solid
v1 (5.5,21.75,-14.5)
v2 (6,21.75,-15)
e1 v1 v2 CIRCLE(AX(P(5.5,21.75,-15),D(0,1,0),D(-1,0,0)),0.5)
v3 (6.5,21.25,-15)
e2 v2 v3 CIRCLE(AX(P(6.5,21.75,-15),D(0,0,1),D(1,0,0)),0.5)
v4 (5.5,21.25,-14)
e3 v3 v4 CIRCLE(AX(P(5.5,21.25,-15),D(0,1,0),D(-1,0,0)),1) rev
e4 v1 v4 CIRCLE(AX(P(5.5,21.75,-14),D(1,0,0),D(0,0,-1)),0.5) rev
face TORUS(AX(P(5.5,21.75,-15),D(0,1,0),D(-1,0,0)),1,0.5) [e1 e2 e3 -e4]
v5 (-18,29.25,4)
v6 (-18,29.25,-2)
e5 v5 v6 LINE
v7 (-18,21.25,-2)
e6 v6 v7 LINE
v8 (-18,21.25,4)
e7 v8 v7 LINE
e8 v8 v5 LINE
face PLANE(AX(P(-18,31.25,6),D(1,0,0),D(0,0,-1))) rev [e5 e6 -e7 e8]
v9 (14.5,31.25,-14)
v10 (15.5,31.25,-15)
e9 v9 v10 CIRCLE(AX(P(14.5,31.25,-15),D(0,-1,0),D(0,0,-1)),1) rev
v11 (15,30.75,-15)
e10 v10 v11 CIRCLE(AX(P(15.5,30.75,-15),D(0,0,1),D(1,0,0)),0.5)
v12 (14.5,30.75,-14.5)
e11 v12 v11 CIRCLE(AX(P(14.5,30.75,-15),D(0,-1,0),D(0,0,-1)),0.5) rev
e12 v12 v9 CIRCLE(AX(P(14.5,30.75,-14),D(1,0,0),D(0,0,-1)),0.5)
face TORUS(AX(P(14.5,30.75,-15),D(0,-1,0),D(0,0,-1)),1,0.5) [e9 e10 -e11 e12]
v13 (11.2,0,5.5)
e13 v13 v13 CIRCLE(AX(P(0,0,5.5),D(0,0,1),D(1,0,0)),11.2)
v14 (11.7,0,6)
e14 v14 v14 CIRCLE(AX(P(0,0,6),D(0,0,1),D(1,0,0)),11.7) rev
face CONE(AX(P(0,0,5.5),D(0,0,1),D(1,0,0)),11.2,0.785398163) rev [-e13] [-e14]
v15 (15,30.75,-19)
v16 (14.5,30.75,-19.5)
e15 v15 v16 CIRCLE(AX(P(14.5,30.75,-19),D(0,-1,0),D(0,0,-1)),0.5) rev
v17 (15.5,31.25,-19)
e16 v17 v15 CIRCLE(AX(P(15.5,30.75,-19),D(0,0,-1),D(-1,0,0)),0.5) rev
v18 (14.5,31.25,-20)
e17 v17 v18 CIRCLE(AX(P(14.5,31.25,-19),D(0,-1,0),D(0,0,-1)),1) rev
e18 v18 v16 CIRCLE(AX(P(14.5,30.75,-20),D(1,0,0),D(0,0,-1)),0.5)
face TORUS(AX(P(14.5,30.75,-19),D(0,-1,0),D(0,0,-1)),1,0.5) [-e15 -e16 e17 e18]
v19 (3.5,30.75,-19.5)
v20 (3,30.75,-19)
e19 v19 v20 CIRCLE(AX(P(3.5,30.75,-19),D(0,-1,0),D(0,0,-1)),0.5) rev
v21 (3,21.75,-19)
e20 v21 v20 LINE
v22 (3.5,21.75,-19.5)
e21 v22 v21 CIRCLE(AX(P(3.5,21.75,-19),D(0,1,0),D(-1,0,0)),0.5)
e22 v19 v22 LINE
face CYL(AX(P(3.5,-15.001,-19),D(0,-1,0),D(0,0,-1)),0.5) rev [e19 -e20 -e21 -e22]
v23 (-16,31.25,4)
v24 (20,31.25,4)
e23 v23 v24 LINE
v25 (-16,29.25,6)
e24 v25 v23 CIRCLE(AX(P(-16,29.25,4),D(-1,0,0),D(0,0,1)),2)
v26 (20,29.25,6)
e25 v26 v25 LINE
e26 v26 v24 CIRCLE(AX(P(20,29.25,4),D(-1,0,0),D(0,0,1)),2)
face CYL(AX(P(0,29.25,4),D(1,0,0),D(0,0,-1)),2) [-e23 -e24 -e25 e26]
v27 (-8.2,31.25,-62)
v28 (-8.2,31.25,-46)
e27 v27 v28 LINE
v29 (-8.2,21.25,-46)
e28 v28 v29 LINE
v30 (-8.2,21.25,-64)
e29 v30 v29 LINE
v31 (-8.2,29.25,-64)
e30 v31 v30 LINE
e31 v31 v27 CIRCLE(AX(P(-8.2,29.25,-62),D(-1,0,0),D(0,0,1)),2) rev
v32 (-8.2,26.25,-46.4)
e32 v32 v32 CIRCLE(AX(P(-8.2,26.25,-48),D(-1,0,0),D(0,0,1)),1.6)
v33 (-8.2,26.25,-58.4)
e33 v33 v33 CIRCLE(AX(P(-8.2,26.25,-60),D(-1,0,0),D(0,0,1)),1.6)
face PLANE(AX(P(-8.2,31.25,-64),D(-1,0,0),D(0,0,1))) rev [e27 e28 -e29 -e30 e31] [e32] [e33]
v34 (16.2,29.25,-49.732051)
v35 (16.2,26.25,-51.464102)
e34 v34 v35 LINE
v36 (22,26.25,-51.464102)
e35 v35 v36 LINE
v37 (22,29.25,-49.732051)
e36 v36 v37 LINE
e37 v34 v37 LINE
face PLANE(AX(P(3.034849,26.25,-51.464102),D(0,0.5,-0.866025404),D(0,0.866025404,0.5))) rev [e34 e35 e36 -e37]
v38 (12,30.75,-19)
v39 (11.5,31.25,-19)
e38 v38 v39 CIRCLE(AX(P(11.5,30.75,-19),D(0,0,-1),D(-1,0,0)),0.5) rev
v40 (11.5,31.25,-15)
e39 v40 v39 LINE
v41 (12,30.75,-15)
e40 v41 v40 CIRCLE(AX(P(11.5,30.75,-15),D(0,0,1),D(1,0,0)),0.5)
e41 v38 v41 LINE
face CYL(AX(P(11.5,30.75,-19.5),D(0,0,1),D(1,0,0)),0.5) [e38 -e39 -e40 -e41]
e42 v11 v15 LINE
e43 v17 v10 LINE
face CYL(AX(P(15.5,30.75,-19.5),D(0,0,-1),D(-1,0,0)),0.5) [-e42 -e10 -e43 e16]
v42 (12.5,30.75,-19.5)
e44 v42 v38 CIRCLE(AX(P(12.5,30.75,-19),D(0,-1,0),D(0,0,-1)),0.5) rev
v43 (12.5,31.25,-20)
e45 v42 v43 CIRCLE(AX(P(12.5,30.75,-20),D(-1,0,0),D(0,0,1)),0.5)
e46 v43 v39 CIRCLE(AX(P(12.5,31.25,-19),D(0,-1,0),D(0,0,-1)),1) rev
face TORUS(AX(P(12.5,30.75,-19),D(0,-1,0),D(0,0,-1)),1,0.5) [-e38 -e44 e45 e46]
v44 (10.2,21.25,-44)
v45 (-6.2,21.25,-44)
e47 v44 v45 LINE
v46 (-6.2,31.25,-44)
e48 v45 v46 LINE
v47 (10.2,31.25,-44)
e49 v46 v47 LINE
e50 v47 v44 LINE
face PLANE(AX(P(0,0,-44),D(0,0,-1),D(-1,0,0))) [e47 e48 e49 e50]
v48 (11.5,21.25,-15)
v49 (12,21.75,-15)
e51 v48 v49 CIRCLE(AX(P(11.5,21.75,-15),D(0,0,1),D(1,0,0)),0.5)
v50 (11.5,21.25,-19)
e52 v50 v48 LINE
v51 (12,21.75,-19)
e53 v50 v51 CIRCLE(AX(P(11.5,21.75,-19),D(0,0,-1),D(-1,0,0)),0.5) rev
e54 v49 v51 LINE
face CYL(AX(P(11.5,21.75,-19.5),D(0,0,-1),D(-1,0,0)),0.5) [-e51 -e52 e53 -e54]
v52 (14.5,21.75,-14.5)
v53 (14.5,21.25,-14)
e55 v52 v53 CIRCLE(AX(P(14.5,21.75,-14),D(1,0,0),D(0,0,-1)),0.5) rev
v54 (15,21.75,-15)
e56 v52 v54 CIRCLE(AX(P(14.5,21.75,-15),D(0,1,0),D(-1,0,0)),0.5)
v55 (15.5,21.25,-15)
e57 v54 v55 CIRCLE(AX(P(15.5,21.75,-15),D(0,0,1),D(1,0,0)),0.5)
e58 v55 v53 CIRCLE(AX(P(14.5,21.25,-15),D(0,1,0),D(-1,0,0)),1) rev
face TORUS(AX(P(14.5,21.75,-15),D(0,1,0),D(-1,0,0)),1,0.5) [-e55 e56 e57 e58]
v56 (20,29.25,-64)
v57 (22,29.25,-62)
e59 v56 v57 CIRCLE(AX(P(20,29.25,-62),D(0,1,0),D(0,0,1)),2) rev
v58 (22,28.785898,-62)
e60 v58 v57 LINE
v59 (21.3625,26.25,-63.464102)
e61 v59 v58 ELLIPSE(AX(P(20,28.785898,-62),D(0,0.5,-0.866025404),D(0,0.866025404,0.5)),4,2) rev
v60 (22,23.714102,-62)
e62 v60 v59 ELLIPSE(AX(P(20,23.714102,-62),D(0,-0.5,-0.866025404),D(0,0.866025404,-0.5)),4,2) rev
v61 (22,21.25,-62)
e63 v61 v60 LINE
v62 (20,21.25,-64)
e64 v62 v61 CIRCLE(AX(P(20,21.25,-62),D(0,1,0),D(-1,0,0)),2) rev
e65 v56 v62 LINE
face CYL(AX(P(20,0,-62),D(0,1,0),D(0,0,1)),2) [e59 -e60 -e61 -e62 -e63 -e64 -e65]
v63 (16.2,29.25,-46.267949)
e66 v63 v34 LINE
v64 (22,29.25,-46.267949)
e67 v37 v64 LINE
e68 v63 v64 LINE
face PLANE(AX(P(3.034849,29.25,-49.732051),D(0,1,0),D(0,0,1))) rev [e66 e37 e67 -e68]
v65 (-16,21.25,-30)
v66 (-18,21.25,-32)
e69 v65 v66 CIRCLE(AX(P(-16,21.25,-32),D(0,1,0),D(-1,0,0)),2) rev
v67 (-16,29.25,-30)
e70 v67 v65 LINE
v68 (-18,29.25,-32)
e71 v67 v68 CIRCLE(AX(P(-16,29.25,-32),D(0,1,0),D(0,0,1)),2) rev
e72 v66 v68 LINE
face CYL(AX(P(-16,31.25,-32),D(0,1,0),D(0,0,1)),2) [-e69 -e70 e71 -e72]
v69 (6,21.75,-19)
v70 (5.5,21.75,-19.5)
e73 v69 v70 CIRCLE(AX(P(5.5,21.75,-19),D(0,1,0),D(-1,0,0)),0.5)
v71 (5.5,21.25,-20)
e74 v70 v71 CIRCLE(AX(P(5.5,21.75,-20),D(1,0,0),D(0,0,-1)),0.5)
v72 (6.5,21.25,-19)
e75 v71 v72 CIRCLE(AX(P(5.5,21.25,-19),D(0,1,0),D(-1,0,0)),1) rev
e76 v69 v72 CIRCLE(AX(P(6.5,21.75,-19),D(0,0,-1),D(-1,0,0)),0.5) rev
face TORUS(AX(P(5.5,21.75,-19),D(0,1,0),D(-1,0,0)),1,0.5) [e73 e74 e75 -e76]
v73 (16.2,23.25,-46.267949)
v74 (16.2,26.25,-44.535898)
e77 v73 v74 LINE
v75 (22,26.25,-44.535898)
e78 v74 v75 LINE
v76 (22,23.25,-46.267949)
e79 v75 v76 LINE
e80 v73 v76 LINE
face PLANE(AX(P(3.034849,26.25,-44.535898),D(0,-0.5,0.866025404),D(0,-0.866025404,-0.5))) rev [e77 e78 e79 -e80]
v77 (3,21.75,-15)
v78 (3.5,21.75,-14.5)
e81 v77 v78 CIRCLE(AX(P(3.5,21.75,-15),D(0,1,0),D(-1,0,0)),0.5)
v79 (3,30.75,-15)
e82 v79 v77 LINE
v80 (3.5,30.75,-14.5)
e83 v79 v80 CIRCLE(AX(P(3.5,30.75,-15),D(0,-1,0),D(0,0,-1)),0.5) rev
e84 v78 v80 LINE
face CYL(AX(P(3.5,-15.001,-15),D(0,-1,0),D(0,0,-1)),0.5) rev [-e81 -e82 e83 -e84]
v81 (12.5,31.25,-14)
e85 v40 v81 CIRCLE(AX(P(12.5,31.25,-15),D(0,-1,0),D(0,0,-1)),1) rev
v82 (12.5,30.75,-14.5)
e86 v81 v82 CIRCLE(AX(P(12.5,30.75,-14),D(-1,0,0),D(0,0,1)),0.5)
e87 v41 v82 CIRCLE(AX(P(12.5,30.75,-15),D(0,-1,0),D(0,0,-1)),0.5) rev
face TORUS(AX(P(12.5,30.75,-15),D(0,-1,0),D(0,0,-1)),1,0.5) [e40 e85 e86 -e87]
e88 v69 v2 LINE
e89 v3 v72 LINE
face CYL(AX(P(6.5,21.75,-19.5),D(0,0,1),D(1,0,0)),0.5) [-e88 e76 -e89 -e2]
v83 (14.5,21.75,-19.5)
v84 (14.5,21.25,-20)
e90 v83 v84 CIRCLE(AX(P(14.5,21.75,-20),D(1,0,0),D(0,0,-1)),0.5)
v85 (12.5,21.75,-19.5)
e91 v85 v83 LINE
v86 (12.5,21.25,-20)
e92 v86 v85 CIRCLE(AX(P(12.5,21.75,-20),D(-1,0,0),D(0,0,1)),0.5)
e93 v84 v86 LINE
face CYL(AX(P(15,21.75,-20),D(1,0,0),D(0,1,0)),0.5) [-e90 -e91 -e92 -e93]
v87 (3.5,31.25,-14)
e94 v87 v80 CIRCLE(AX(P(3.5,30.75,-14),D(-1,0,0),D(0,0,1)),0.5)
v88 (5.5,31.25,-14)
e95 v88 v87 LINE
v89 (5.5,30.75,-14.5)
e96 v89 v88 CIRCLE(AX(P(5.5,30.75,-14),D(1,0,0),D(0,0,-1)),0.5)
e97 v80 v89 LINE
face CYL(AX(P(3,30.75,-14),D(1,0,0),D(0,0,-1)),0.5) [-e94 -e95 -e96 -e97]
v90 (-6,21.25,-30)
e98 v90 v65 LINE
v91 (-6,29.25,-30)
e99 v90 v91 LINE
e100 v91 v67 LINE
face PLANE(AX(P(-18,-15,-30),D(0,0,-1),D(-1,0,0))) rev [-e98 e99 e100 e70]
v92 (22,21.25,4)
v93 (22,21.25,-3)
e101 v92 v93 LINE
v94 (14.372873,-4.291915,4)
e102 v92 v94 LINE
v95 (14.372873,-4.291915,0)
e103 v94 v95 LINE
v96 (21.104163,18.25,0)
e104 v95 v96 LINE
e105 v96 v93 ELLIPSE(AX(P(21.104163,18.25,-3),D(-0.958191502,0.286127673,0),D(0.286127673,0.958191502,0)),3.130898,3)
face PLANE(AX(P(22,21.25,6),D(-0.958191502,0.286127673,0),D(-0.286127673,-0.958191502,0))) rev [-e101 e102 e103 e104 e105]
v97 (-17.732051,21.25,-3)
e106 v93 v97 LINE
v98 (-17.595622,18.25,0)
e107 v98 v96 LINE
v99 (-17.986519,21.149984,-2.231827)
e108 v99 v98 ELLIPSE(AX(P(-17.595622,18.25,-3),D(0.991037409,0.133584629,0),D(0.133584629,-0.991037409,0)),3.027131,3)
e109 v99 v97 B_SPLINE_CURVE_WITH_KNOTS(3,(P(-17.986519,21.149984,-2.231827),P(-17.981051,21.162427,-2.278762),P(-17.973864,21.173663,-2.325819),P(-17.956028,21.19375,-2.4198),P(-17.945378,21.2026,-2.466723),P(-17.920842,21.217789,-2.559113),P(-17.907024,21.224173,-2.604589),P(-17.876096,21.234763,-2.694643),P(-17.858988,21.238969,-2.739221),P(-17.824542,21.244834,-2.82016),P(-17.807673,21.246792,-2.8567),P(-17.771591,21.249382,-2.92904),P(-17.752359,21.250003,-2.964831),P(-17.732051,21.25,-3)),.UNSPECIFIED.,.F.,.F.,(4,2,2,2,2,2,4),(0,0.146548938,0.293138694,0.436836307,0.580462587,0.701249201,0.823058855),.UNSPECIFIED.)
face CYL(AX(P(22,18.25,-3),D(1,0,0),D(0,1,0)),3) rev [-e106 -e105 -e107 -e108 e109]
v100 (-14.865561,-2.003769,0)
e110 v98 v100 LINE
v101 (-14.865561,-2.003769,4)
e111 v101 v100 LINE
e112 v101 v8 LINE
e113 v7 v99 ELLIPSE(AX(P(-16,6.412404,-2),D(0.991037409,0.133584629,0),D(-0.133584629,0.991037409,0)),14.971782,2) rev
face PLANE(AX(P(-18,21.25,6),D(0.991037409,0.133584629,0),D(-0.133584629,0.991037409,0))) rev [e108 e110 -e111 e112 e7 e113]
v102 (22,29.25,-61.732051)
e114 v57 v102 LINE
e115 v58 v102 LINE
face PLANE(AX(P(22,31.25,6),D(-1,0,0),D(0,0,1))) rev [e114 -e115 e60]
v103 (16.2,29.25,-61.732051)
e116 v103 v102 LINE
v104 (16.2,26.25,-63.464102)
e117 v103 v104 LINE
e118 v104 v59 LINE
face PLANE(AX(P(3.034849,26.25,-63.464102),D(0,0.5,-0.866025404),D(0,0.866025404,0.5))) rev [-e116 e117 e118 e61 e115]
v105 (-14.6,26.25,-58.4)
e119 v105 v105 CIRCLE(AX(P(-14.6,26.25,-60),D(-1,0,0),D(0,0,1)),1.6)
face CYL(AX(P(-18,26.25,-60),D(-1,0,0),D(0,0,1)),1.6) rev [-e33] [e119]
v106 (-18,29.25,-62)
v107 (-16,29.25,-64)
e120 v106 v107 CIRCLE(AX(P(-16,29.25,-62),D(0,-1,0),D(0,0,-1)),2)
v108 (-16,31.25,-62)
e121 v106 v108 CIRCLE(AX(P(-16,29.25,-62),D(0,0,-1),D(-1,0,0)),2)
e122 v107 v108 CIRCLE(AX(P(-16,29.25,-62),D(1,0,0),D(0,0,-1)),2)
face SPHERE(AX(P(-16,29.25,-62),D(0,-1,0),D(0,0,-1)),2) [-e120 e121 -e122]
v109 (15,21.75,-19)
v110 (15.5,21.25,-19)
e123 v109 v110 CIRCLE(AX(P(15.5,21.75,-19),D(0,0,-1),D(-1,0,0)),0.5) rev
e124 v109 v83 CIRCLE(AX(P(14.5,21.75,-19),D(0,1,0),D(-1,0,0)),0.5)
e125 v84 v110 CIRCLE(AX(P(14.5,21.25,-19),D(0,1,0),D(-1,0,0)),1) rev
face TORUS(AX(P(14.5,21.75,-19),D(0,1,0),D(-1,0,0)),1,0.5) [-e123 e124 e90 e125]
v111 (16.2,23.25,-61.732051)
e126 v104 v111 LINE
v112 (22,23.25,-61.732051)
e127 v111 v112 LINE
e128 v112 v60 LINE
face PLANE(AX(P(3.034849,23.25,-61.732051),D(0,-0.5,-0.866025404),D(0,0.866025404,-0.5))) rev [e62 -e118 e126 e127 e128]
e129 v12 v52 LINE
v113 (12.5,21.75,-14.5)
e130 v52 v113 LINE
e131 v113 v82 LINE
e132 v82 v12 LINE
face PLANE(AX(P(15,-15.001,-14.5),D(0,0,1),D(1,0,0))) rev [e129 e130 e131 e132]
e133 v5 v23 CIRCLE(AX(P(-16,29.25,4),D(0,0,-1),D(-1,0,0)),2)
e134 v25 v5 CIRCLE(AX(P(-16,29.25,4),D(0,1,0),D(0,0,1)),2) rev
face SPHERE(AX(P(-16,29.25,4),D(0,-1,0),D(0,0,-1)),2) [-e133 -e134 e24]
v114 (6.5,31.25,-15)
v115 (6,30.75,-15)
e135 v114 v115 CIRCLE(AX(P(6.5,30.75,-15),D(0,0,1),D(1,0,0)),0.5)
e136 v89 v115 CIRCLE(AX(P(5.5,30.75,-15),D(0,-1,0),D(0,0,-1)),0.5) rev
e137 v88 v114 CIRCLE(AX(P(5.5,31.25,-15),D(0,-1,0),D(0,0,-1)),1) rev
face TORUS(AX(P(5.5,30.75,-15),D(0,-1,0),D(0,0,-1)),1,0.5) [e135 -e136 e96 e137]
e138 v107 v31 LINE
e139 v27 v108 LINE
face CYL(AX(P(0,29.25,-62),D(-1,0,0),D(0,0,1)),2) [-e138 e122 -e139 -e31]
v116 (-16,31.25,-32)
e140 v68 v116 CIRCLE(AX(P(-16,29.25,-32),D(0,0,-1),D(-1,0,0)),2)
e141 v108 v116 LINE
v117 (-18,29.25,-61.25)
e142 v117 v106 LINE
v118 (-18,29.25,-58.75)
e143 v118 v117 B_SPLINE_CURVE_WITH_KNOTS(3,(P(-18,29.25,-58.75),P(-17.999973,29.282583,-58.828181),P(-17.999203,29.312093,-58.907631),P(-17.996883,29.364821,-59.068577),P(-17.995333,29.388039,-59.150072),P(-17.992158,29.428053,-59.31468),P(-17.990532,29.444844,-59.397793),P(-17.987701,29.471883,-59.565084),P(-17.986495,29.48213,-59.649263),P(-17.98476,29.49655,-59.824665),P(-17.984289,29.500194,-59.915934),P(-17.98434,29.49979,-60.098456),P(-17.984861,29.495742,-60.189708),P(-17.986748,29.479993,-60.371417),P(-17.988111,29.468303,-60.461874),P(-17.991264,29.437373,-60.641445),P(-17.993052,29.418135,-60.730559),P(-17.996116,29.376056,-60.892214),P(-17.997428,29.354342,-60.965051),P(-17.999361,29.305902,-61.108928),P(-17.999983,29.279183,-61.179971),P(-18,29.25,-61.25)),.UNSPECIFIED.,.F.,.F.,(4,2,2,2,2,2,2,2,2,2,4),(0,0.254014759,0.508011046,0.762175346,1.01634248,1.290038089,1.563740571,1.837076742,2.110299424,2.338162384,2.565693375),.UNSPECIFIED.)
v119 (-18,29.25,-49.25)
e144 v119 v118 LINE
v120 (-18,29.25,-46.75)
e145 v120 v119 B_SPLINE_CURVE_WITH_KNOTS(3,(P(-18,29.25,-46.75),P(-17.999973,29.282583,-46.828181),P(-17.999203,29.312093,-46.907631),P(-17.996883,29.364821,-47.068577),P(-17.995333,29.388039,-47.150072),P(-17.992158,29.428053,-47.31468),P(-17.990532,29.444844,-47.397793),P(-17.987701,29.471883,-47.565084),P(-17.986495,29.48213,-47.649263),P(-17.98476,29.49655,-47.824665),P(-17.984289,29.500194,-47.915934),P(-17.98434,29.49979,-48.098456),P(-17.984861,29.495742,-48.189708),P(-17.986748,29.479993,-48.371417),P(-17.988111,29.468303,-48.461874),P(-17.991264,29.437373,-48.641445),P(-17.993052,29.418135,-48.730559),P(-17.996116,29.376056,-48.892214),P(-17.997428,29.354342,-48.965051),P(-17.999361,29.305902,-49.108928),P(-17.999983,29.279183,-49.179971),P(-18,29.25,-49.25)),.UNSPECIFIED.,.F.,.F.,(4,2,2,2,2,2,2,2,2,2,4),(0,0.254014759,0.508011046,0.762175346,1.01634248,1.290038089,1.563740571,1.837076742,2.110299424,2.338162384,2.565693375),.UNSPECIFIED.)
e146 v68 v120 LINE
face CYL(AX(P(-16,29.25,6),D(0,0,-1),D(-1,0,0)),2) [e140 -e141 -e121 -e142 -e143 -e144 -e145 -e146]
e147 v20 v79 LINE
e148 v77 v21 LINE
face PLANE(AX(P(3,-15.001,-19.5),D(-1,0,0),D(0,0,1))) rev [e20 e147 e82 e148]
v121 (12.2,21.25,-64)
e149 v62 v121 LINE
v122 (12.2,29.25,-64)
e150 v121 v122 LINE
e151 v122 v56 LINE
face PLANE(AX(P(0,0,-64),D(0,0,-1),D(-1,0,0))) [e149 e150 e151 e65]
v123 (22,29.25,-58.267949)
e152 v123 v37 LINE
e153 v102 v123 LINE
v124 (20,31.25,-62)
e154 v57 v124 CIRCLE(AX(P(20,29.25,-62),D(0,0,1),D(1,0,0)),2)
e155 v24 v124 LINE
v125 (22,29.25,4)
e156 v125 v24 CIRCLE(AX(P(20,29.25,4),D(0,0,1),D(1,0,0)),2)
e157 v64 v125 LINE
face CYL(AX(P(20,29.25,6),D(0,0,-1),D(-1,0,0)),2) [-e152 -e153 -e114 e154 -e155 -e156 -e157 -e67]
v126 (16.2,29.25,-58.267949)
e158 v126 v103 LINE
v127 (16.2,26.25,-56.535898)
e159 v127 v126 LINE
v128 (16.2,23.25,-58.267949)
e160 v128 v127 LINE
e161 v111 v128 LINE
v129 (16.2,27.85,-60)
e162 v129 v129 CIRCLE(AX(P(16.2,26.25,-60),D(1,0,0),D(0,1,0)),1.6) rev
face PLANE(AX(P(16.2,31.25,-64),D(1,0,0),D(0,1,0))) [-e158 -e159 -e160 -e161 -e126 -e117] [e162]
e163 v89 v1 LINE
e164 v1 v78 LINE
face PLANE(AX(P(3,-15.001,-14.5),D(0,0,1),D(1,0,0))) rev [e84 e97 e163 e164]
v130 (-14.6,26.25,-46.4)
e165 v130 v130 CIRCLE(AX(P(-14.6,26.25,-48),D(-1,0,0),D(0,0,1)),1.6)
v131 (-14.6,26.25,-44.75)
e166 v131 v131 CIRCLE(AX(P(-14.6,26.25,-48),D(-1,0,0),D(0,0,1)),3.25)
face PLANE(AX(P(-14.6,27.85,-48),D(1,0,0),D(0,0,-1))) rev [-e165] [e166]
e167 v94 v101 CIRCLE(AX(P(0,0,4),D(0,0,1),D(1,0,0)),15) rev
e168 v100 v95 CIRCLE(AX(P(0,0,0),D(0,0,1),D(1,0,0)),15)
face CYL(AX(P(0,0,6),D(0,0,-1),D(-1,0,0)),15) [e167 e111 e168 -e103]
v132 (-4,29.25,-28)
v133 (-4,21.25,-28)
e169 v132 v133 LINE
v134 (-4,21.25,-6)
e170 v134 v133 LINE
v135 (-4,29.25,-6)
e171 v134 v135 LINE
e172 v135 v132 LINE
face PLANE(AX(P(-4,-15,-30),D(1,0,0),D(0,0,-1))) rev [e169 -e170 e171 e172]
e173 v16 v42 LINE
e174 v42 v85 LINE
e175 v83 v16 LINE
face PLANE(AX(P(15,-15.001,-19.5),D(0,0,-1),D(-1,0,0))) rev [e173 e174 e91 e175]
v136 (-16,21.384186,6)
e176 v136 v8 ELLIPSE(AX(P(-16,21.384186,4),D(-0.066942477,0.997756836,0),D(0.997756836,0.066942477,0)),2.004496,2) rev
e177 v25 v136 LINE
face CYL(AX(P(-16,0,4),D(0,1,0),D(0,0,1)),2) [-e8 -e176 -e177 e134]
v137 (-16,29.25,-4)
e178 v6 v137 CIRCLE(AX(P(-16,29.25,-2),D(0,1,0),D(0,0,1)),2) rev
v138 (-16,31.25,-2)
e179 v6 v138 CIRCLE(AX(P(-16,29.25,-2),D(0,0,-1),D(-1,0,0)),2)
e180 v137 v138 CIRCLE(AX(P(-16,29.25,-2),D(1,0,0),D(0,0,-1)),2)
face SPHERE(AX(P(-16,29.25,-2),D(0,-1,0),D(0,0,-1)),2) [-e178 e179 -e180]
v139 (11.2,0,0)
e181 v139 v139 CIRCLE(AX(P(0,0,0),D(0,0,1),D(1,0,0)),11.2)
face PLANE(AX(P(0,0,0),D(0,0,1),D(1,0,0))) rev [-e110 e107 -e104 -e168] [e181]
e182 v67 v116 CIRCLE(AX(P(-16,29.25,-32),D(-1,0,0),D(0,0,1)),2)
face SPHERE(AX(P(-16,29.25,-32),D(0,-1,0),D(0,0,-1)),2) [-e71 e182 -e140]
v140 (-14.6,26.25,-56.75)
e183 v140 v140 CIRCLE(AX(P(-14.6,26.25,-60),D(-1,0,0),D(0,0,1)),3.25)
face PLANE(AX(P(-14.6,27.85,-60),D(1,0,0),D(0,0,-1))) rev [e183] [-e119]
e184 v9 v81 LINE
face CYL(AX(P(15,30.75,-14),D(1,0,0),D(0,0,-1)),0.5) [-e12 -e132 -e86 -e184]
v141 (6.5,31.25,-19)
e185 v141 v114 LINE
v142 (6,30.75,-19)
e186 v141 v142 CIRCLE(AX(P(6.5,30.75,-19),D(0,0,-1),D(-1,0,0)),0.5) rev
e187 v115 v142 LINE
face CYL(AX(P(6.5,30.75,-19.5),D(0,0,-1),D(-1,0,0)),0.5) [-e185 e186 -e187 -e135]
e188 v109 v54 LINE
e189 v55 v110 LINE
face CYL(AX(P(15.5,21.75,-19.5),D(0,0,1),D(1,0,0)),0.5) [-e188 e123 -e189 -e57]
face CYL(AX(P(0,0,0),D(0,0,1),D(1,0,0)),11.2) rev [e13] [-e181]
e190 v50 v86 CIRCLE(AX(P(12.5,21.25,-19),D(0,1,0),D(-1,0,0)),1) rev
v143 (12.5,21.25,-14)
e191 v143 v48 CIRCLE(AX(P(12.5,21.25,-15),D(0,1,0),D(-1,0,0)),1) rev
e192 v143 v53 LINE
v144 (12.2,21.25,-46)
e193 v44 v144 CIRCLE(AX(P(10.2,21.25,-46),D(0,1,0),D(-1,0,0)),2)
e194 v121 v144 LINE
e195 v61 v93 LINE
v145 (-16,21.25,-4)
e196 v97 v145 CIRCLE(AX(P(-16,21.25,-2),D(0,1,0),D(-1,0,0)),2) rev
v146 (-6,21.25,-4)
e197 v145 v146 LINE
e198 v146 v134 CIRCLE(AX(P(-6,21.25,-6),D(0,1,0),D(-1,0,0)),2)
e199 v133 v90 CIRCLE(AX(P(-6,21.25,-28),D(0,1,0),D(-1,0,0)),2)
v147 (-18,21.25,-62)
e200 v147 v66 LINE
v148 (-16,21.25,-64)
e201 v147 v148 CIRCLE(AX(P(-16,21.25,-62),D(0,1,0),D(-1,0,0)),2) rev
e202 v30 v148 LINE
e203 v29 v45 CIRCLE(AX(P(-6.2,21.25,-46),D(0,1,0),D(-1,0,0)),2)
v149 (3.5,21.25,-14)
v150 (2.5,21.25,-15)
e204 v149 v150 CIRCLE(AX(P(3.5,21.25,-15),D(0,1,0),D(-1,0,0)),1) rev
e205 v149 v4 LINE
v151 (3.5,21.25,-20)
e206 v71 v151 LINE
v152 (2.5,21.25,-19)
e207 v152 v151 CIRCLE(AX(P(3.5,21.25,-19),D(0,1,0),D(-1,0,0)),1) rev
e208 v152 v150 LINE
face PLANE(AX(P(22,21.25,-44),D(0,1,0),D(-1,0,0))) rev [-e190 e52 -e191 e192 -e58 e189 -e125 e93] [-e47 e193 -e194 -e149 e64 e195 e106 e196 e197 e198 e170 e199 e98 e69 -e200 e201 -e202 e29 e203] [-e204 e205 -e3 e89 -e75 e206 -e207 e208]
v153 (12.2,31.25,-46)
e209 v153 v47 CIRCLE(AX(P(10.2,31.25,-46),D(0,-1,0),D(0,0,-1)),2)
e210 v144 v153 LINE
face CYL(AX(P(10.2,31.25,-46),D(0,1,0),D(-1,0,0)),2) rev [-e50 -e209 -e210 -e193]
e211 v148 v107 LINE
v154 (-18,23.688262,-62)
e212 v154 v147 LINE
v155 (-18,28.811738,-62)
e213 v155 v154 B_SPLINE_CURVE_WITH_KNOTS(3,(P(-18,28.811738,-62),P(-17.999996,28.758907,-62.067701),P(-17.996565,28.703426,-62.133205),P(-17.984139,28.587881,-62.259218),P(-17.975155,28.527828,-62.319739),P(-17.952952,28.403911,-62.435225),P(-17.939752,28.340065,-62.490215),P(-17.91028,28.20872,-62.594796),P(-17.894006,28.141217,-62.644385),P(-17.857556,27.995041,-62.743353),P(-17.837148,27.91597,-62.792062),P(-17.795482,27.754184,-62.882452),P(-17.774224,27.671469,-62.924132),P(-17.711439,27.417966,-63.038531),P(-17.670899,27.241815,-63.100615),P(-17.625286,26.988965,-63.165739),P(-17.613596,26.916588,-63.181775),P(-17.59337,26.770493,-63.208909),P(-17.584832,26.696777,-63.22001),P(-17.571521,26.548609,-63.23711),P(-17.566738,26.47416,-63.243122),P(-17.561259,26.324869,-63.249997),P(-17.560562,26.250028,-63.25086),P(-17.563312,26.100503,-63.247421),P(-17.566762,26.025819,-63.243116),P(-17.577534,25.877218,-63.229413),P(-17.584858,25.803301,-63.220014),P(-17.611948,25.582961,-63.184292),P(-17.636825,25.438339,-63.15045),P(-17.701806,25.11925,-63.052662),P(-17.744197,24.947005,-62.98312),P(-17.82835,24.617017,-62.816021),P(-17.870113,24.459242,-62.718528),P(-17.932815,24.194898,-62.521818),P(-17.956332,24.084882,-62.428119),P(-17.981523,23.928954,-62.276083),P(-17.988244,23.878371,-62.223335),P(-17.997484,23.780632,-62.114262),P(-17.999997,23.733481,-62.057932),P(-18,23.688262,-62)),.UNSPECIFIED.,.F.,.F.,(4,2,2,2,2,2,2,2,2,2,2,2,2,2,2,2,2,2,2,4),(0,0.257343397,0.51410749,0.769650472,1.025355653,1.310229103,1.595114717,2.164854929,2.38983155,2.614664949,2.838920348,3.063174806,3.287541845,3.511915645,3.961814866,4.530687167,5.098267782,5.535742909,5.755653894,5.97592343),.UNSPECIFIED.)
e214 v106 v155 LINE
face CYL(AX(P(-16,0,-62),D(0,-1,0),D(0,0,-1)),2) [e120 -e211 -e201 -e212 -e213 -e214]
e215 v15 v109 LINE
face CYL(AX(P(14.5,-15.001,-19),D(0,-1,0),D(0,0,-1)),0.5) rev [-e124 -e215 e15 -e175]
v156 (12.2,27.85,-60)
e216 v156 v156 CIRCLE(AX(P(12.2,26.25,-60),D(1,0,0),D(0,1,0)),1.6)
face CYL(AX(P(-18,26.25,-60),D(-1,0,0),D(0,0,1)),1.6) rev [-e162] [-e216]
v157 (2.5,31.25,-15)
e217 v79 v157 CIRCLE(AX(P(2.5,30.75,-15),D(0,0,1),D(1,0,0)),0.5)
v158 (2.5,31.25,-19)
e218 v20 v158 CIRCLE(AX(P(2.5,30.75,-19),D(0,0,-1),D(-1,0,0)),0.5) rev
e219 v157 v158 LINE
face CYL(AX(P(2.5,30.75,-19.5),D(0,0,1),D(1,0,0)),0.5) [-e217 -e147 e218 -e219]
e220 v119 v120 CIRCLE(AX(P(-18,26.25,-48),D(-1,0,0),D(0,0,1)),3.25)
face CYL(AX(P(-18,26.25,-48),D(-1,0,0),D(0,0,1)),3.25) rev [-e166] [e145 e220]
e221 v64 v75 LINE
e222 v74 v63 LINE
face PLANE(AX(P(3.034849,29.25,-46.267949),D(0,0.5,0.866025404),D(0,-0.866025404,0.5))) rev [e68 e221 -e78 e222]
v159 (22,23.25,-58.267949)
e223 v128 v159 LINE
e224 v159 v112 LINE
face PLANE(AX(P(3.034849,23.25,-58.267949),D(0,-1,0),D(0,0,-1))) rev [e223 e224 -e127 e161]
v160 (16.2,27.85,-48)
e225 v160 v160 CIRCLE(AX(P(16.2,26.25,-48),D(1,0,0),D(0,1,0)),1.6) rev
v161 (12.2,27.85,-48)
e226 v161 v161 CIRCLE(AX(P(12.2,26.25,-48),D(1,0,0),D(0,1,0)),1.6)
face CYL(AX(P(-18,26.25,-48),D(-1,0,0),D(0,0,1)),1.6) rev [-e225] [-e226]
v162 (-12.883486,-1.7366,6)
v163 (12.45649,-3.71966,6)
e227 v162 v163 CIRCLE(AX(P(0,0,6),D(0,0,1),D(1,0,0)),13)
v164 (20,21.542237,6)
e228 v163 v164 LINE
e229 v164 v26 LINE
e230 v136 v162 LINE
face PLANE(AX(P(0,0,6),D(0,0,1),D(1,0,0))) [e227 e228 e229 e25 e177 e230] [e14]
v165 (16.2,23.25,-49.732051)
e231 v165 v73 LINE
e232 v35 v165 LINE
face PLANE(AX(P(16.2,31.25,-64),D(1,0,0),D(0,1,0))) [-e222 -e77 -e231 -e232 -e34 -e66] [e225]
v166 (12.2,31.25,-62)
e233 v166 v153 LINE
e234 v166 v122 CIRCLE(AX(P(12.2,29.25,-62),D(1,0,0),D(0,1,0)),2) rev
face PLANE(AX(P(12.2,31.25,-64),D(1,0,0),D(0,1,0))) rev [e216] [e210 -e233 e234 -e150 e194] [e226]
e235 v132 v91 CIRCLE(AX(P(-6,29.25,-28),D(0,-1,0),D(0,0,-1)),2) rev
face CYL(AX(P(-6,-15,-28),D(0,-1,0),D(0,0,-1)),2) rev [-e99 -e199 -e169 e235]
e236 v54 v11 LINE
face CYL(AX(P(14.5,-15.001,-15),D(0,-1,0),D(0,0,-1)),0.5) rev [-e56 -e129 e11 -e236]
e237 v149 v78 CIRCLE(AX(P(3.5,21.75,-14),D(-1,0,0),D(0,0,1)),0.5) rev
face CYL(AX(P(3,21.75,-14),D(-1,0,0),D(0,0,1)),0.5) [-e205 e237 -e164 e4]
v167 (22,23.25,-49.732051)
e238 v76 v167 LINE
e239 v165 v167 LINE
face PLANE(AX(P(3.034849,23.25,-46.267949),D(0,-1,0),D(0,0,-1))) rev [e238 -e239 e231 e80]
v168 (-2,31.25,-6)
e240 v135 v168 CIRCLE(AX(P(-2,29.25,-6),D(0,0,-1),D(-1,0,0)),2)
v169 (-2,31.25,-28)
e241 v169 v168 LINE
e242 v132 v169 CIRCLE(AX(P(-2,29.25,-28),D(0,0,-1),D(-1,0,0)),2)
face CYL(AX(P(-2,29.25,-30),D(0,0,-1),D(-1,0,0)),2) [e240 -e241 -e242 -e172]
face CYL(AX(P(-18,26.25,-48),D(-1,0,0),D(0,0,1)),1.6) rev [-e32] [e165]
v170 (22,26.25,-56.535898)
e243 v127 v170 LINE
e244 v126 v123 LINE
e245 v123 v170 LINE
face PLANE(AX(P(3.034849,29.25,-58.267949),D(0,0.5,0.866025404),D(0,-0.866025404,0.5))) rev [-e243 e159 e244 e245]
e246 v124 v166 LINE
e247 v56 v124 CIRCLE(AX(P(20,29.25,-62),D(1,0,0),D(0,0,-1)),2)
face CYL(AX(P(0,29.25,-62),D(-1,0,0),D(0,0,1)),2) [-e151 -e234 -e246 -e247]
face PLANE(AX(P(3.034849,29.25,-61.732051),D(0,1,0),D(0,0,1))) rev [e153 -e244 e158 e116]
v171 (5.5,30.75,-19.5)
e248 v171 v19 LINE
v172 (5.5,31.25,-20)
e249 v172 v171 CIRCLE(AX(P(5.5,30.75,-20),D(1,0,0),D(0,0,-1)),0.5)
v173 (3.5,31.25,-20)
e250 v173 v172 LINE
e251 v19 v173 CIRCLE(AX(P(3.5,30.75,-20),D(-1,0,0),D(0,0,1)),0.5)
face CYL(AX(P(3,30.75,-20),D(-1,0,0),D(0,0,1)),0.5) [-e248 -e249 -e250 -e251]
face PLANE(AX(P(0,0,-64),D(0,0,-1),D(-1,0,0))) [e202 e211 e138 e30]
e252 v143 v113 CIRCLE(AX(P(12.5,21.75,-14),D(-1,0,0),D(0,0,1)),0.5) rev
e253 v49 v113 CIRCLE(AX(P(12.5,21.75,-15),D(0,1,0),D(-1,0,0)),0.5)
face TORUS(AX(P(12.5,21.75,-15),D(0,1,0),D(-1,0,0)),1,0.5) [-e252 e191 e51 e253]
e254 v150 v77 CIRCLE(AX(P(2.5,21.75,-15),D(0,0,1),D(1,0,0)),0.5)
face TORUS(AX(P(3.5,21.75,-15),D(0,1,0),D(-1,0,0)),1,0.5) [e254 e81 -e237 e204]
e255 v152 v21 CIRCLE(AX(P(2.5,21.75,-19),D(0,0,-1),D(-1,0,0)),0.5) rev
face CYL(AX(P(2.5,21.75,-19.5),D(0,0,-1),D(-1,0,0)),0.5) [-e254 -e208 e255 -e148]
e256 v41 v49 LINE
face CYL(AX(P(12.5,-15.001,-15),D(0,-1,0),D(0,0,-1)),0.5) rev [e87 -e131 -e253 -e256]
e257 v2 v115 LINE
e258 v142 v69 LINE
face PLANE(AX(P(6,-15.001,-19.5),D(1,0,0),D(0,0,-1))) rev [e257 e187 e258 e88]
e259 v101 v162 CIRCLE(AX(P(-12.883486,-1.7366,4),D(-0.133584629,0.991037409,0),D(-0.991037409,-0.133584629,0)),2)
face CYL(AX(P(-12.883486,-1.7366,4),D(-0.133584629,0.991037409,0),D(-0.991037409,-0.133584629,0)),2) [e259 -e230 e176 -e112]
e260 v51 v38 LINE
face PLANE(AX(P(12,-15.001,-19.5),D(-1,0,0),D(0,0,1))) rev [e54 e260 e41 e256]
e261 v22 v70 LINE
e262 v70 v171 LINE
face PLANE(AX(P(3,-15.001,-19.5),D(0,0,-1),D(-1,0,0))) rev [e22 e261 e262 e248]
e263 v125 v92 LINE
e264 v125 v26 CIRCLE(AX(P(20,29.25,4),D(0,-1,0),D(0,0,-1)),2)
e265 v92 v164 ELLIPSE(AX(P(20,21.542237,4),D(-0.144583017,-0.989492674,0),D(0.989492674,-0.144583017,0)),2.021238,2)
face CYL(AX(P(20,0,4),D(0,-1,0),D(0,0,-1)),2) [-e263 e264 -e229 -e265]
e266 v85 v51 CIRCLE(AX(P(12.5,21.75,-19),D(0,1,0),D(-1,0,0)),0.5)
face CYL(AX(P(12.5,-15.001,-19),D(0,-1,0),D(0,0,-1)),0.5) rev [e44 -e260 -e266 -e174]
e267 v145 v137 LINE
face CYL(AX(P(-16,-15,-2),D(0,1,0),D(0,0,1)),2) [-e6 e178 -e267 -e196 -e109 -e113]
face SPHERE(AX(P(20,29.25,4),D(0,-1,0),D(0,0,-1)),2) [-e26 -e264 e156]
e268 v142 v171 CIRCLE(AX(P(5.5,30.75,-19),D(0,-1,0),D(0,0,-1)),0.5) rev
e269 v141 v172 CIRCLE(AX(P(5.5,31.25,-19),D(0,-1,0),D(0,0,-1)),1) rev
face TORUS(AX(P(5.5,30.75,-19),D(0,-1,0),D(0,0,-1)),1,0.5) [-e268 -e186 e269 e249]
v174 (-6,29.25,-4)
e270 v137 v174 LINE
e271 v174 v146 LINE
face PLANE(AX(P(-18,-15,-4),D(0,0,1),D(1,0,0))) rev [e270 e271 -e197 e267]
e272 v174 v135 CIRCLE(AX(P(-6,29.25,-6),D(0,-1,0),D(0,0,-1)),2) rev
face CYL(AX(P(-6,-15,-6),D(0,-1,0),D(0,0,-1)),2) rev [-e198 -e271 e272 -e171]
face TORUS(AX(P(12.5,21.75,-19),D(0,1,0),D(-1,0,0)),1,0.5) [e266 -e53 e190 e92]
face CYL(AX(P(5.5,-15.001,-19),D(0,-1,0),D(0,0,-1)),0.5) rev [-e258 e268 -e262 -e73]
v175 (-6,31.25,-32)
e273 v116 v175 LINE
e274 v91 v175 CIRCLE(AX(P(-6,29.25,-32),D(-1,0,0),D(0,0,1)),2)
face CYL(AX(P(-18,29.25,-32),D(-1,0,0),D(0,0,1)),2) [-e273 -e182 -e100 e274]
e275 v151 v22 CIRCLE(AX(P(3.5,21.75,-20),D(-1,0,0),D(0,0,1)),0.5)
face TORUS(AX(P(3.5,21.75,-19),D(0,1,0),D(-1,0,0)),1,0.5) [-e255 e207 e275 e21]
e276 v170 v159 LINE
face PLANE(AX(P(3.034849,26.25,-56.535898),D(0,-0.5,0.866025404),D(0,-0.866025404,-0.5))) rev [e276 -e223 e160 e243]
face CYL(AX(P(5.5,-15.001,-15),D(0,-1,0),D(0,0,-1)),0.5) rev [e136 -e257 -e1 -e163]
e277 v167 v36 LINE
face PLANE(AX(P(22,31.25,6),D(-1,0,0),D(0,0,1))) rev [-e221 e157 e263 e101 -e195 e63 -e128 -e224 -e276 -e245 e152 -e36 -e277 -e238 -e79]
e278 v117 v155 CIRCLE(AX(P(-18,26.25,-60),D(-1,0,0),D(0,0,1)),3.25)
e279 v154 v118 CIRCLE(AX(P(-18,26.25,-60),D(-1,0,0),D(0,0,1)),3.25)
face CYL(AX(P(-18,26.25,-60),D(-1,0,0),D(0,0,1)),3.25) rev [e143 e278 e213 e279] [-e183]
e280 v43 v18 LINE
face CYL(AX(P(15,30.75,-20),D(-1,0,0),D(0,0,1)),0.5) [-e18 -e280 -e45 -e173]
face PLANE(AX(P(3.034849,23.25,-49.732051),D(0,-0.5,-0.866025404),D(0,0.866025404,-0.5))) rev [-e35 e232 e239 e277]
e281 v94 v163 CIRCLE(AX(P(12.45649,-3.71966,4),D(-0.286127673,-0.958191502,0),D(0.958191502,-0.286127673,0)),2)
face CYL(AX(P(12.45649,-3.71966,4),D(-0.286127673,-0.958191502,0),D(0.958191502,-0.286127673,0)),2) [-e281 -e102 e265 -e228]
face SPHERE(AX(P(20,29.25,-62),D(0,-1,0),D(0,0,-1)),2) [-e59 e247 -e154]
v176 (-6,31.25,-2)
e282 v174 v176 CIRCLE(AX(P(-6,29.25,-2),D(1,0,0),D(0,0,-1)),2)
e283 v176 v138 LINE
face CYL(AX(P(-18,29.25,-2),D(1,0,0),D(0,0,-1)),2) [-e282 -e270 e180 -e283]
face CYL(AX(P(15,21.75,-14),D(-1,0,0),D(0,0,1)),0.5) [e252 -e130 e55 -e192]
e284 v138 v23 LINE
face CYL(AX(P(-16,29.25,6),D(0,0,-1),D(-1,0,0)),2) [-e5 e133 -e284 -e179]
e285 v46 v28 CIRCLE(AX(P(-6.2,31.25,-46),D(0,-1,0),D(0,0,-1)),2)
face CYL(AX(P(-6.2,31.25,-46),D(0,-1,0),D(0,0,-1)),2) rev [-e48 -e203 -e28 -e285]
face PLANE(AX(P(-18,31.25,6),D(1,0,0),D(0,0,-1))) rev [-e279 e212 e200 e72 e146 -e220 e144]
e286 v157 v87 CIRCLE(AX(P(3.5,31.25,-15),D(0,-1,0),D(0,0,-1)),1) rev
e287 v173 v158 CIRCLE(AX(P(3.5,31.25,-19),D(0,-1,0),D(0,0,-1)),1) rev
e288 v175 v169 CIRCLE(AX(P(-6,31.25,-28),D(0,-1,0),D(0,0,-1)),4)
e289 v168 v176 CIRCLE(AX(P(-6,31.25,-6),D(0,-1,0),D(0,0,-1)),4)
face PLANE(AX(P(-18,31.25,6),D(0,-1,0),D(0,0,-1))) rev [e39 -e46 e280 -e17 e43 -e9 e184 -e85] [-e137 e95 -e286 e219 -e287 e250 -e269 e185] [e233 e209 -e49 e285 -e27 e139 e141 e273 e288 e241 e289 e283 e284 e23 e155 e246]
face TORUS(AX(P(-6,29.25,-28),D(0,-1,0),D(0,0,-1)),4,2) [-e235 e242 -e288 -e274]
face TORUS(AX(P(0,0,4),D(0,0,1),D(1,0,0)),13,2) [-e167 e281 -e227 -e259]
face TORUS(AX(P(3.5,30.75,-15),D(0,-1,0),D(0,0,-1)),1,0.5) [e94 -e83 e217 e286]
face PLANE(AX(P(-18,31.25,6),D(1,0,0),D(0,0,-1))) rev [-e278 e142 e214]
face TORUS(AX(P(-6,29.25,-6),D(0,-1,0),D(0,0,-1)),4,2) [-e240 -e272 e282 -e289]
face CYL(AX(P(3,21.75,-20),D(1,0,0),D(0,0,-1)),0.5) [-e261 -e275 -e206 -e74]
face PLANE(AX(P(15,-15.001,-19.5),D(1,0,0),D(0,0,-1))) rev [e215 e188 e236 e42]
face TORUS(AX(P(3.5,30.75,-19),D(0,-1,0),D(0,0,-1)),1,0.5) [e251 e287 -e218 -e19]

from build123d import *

# Parameters (mm, degrees)
BOSS_EXTRUDE1_DEPTH                                 = 6
SKETCH2_R                                           = 11.2
CUT_EXTRUDE1_DEPTH                                  = 39.685430074
SKETCH3_W                                           = 40
SKETCH3_H                                           = 10
BOSS_EXTRUDE2_DEPTH                                 = 44
SKETCH4_W                                           = 9.8
SKETCH4_H                                           = 10
BOSS_EXTRUDE3_DEPTH                                 = 20
FILLET1_R                                           = 3
CBORE_FOR_M3_HEX_SOCKET_HEAD_CAP_SCREW1_D           = 3.2
CBORE_FOR_M3_HEX_SOCKET_HEAD_CAP_SCREW1_CBORE_D     = 6.5
CBORE_FOR_M3_HEX_SOCKET_HEAD_CAP_SCREW1_CBORE_DEPTH = 3.4
CUT_EXTRUDE3_DEPTH                                  = 5.8
SKETCH9_W                                           = 14
SKETCH9_H                                           = 26
CUT_EXTRUDE4_DEPTH                                  = 82.969887764
FILLET2_R                                           = 2
FILLET3_R                                           = 2
FILLET4_R                                           = 2
FILLET5_R                                           = 2
CHAMFER1_SIZE                                       = 0.5
CUT_EXTRUDE5_REACH                                  = 83.97
SKETCH10_W                                          = 3
SKETCH10_H                                          = 5
FILLET6_R                                           = 0.5


with BuildPart() as part:
    # Sketch1 → Boss-Extrude1 (new body)
    with BuildSketch(Plane.XY):
        with BuildLine():
            Line((22, 31.25), (22, 21.25))
            Line((22, 21.25), (14.372872533, -4.291915093))
            ThreePointArc((14.372872533, -4.291915093), (-1.170294045, -14.954277376), (-14.865561141, -2.003769437))
            Line((-14.865561141, -2.003769437), (-18, 21.25))
            Line((-18, 21.25), (-18, 31.25))
            Line((-18, 31.25), (22, 31.25))
        make_face()
    extrude(amount=BOSS_EXTRUDE1_DEPTH)

    # Sketch2 → Cut-Extrude1 (cut, through all)
    with BuildSketch(Plane.XY.offset(6)):
        Circle(SKETCH2_R)
    extrude(amount=-CUT_EXTRUDE1_DEPTH, mode=Mode.SUBTRACT)

    # Sketch3 → Boss-Extrude2 (add)
    with BuildSketch(Plane(origin=(0, 0, 0), x_dir=(-1, 0, 0), z_dir=(0, 0, -1))):
        with Locations((-2, 26.25)):
            Rectangle(SKETCH3_W, SKETCH3_H)
    extrude(amount=BOSS_EXTRUDE2_DEPTH)

    # Sketch4 → Boss-Extrude3 (add)
    with BuildSketch(Plane(origin=(0, 0, -44), x_dir=(-1, 0, 0), z_dir=(0, 0, -1))):
        with Locations((-17.1, 26.25)):
            Rectangle(SKETCH4_W, SKETCH4_H)
        with Locations((13.1, 26.25)):
            Rectangle(SKETCH4_W, SKETCH4_H)
    extrude(amount=BOSS_EXTRUDE3_DEPTH)

    # Fillet1
    fillet1_edges = [part.edges().sort_by_distance(p)[0] for p in [
        (2, 21.25, 0),
    ]]
    fillet(fillet1_edges, radius=FILLET1_R)

    # CBORE for M3 Hex Socket Head Cap Screw1 (through all)
    with Locations(Plane.ZY.offset(18)):
        with Locations((-60, 26.25), (-48, 26.25)):
            CounterBoreHole(CBORE_FOR_M3_HEX_SOCKET_HEAD_CAP_SCREW1_D / 2, CBORE_FOR_M3_HEX_SOCKET_HEAD_CAP_SCREW1_CBORE_D / 2, CBORE_FOR_M3_HEX_SOCKET_HEAD_CAP_SCREW1_CBORE_DEPTH)

    # Sketch8 → Cut-Extrude3 (cut)
    with BuildSketch(Plane(origin=(22, 0, 0), x_dir=(0, 0, -1), z_dir=(1, 0, 0))):
        Polygon((49.732050808, 29.25), (46.267949192, 29.25), (44.535898385, 26.25), (46.267949192, 23.25), (49.732050808, 23.25), (51.464101615, 26.25), align=None)
        Polygon((58.267949192, 29.25), (56.535898385, 26.25), (58.267949192, 23.25), (61.732050808, 23.25), (63.464101615, 26.25), (61.732050808, 29.25), align=None)
    extrude(amount=-CUT_EXTRUDE3_DEPTH, mode=Mode.SUBTRACT)

    # Sketch9 → Cut-Extrude4 (cut, through all)
    with BuildSketch(Plane(origin=(0, 31.25, 0), x_dir=(1, 0, 0), z_dir=(0, 1, 0))):
        with Locations((-11, 17)):
            Rectangle(SKETCH9_W, SKETCH9_H)
    extrude(amount=-CUT_EXTRUDE4_DEPTH, mode=Mode.SUBTRACT)

    # Fillet2
    fillet2_edges = [part.edges().sort_by_distance(p)[0] for p in [
        (-4, 26.25, -30),
        (-4, 26.25, -4),
    ]]
    fillet(fillet2_edges, radius=FILLET2_R)

    # Fillet3
    fillet3_edges = [part.edges().sort_by_distance(p)[0] for p in [
        (12.2, 26.25, -44),
        (-8.2, 26.25, -44),
    ]]
    fillet(fillet3_edges, radius=FILLET3_R)

    # Fillet4
    # the kernel refuses this fillet: 2 mm, written as the material it takes off along each edge
    with BuildSketch(Plane(origin=(-14.865561141, -2.003769437, 6), x_dir=(0.9910374094124887, 0.13358462914940175, 0), z_dir=(-0.13358462914940175, 0.9910374094124889, 0))) as fillet4_piece_1:
        with BuildLine():
            CenterArc((FILLET4_R, FILLET4_R), FILLET4_R, 180, 90)
            Line((0, FILLET4_R), (0, 0))
            Line((0, 0), (FILLET4_R, 0))
        make_face()
    extrude(amount=28.464068275, mode=Mode.SUBTRACT)
    with BuildSketch(Plane(origin=(0, 0, 6), x_dir=(0.9581915021729206, -0.2861276728378469, 0), z_dir=(0.2861276728378469, 0.9581915021729206, 0))) as fillet4_piece_2:
        with BuildLine():
            CenterArc((15 - FILLET4_R, FILLET4_R), FILLET4_R, 270, 90)
            Line((15, FILLET4_R), (15, 0))
            Line((15, 0), (15 - FILLET4_R, 0))
        make_face()
    revolve(axis=Axis((0, 0, 6), (0, 0, -1)), revolution_arc=155.696949385, mode=Mode.SUBTRACT)
    with BuildSketch(Plane(origin=(23.430638364, 26.040957511, 6), x_dir=(0, 0, -1), z_dir=(-0.2861276728378473, -0.9581915021729205, 0))) as fillet4_piece_3:
        with BuildLine():
            CenterArc((FILLET4_R, -FILLET4_R), FILLET4_R, 90, 90)
            Line((0, -FILLET4_R), (0, 0))
            Line((0, 0), (FILLET4_R, 0))
        make_face()
    extrude(amount=31.656378224, mode=Mode.SUBTRACT)
    with BuildSketch(Plane(origin=(-18, 16.25, 6), x_dir=(0, 0, -1), z_dir=(0, 1, 0)), Plane(origin=(22, 36.25, 6), x_dir=(0, 0, -1), z_dir=(0, -1, 0))) as fillet4_piece_4:
        with BuildLine():
            CenterArc((FILLET4_R, -FILLET4_R), FILLET4_R, 90, 90)
            Line((0, -FILLET4_R), (0, 0))
            Line((0, 0), (FILLET4_R, 0))
        make_face()
    extrude(amount=20, mode=Mode.SUBTRACT)
    with BuildSketch(Plane(origin=(-18, 36.25, -4), x_dir=(1, 0, 0), z_dir=(0, -1, 0)), Plane(origin=(-18, 36.25, -30), x_dir=(0, 0, -1), z_dir=(0, -1, 0)), Plane(origin=(22, 16.25, -64), x_dir=(-1, 0, 0), z_dir=(0, 1, 0)), Plane(origin=(-18, 36.25, -64), x_dir=(1, 0, 0), z_dir=(0, -1, 0))) as fillet4_piece_5:
        with BuildLine():
            CenterArc((FILLET4_R, FILLET4_R), FILLET4_R, 180, 90)
            Line((0, FILLET4_R), (0, 0))
            Line((0, 0), (FILLET4_R, 0))
        make_face()
    extrude(amount=20, mode=Mode.SUBTRACT)

    # Fillet5
    # the kernel refuses this fillet: 2 mm, written as the material it takes off along each edge
    with BuildSketch(Plane(origin=(-4, 31.25, -28), x_dir=(0, -1, 0), z_dir=(0, 0, 1))) as fillet5_piece_1:
        with BuildLine():
            CenterArc((FILLET5_R, FILLET5_R), FILLET5_R, 180, 90)
            Line((0, FILLET5_R), (0, 0))
            Line((0, 0), (FILLET5_R, 0))
        make_face()
    extrude(amount=22, mode=Mode.SUBTRACT)
    with BuildSketch(Plane(origin=(-16, 31.25, -30), x_dir=(0, -1, 0), z_dir=(1, 0, 0)), Plane(origin=(-6, 31.25, -4), x_dir=(0, -1, 0), z_dir=(-1, 0, 0))) as fillet5_piece_2:
        with BuildLine():
            CenterArc((FILLET5_R, FILLET5_R), FILLET5_R, 180, 90)
            Line((0, FILLET5_R), (0, 0))
            Line((0, 0), (FILLET5_R, 0))
        make_face()
    extrude(amount=10, mode=Mode.SUBTRACT)
    with BuildSketch(Plane(origin=(-6, 31.25, -6), x_dir=(1, 0, 0), z_dir=(0, 0, -1))) as fillet5_piece_3:
        with BuildLine():
            CenterArc((2 + FILLET5_R, FILLET5_R), FILLET5_R, 180, 90)
            Line((2 + FILLET5_R, 0), (2, 0))
            Line((2, 0), (2, FILLET5_R))
        make_face()
    revolve(axis=Axis((-6, 31.25, -6), (0, -1, 0)), revolution_arc=90, mode=Mode.SUBTRACT)
    with BuildSketch(Plane(origin=(-6, 31.25, -28), x_dir=(0, 0, -1), z_dir=(-1, 0, 0))) as fillet5_piece_4:
        with BuildLine():
            CenterArc((2 + FILLET5_R, FILLET5_R), FILLET5_R, 180, 90)
            Line((2 + FILLET5_R, 0), (2, 0))
            Line((2, 0), (2, FILLET5_R))
        make_face()
    revolve(axis=Axis((-6, 31.25, -28), (0, -1, 0)), revolution_arc=90, mode=Mode.SUBTRACT)
    with BuildSketch(Plane(origin=(-16, 31.25, 6), x_dir=(0, 0, -1), z_dir=(1, 0, 0))) as fillet5_piece_5:
        with BuildLine():
            CenterArc((FILLET5_R, -FILLET5_R), FILLET5_R, 90, 90)
            Line((0, -FILLET5_R), (0, 0))
            Line((0, 0), (FILLET5_R, 0))
        make_face()
    extrude(amount=36, mode=Mode.SUBTRACT)
    with BuildSketch(Plane(origin=(-18, 31.25, -2), x_dir=(1, 0, 0), z_dir=(0, 0, 1))) as fillet5_piece_6:
        with BuildLine():
            CenterArc((FILLET5_R, -FILLET5_R), FILLET5_R, 90, 90)
            Line((0, -FILLET5_R), (0, 0))
            Line((0, 0), (FILLET5_R, 0))
        make_face()
    extrude(amount=6, mode=Mode.SUBTRACT)
    with BuildSketch(Plane(origin=(-18, 31.25, -62), x_dir=(0, -1, 0), z_dir=(0, 0, 1))) as fillet5_piece_7:
        with BuildLine():
            CenterArc((FILLET5_R, FILLET5_R), FILLET5_R, 180, 90)
            Line((0, FILLET5_R), (0, 0))
            Line((0, 0), (FILLET5_R, 0))
        make_face()
    extrude(amount=30, mode=Mode.SUBTRACT)
    with BuildSketch(Plane(origin=(22, 31.25, -62), x_dir=(0, -1, 0), z_dir=(0, 0, 1))) as fillet5_piece_8:
        with BuildLine():
            CenterArc((FILLET5_R, -FILLET5_R), FILLET5_R, 90, 90)
            Line((0, -FILLET5_R), (0, 0))
            Line((0, 0), (FILLET5_R, 0))
        make_face()
    extrude(amount=66, mode=Mode.SUBTRACT)
    with BuildSketch(Plane(origin=(-3.2, 31.25, -64), x_dir=(0, -1, 0), z_dir=(-1, 0, 0)), Plane(origin=(20, 31.25, -64), x_dir=(0, -1, 0), z_dir=(-1, 0, 0))) as fillet5_piece_9:
        with BuildLine():
            CenterArc((FILLET5_R, FILLET5_R), FILLET5_R, 180, 90)
            Line((0, FILLET5_R), (0, 0))
            Line((0, 0), (FILLET5_R, 0))
        make_face()
    extrude(amount=12.8, mode=Mode.SUBTRACT)
    with BuildSketch(Plane(origin=(-16, 31.25, -62), x_dir=(0, 0, -1), z_dir=(1, 0, 0))) as fillet5_piece_10:
        with BuildLine():
            CenterArc((2 - FILLET5_R, -FILLET5_R), FILLET5_R, 0, 90)
            Line((2 - FILLET5_R, 0), (2, 0))
            Line((2, 0), (2, -FILLET5_R))
        make_face()
    revolve(axis=Axis((-16, 31.25, -62), (0, 1, 0)), revolution_arc=90, mode=Mode.SUBTRACT)
    with BuildSketch(Plane(origin=(20, 31.25, -62), x_dir=(0, 0, -1), z_dir=(-1, 0, 0))) as fillet5_piece_11:
        with BuildLine():
            CenterArc((2 - FILLET5_R, FILLET5_R), FILLET5_R, 270, 90)
            Line((2 - FILLET5_R, 0), (2, 0))
            Line((2, 0), (2, FILLET5_R))
        make_face()
    revolve(axis=Axis((20, 31.25, -62), (0, -1, 0)), revolution_arc=90, mode=Mode.SUBTRACT)
    with BuildSketch(Plane(origin=(-16, 31.25, -32), x_dir=(-1, 0, 0), z_dir=(0, 0, -1))) as fillet5_piece_12:
        with BuildLine():
            CenterArc((2 - FILLET5_R, -FILLET5_R), FILLET5_R, 0, 90)
            Line((2 - FILLET5_R, 0), (2, 0))
            Line((2, 0), (2, -FILLET5_R))
        make_face()
    revolve(axis=Axis((-16, 31.25, -32), (0, 1, 0)), revolution_arc=90, mode=Mode.SUBTRACT)
    with BuildSketch(Plane(origin=(-16, 31.25, -2), x_dir=(0, 0, -1), z_dir=(1, 0, 0))) as fillet5_piece_13:
        with BuildLine():
            CenterArc((2 - FILLET5_R, -FILLET5_R), FILLET5_R, 0, 90)
            Line((2 - FILLET5_R, 0), (2, 0))
            Line((2, 0), (2, -FILLET5_R))
        make_face()
    revolve(axis=Axis((-16, 31.25, -2), (0, 1, 0)), revolution_arc=90, mode=Mode.SUBTRACT)
    with BuildSketch(Plane(origin=(20, 31.25, 4), x_dir=(0, 0, 1), z_dir=(-1, 0, 0))) as fillet5_piece_14:
        with BuildLine():
            CenterArc((2 - FILLET5_R, -FILLET5_R), FILLET5_R, 0, 90)
            Line((2, -FILLET5_R), (2, 0))
            Line((2, 0), (2 - FILLET5_R, 0))
        make_face()
    revolve(axis=Axis((20, 31.25, 4), (0, 1, 0)), revolution_arc=90, mode=Mode.SUBTRACT)
    with BuildSketch(Plane(origin=(-16, 31.25, 4), x_dir=(0, 0, 1), z_dir=(1, 0, 0))) as fillet5_piece_15:
        with BuildLine():
            CenterArc((2 - FILLET5_R, FILLET5_R), FILLET5_R, 270, 90)
            Line((2, FILLET5_R), (2, 0))
            Line((2, 0), (2 - FILLET5_R, 0))
        make_face()
    revolve(axis=Axis((-16, 31.25, 4), (0, -1, 0)), revolution_arc=90, mode=Mode.SUBTRACT)

    # Chamfer1
    chamfer1_edges = [part.edges().sort_by_distance(p)[0] for p in [
        (-11.2, 0, 6),
    ]]
    chamfer(chamfer1_edges, length=CHAMFER1_SIZE)

    # Sketch10 → Cut-Extrude5 (cut, up to next)
    with BuildSketch(Plane(origin=(0, 31.25, 0), x_dir=(1, 0, 0), z_dir=(0, 1, 0)), mode=Mode.PRIVATE) as cut_extrude5_sk1:
        with Locations((4.5, 17)):
            Rectangle(SKETCH10_W, SKETCH10_H)
    cut_extrude5_tool1 = extrude(cut_extrude5_sk1.sketch, amount=-CUT_EXTRUDE5_REACH, mode=Mode.PRIVATE) & part.part
    # Sketch10 → Cut-Extrude5 (cut, up to next)
    with BuildSketch(Plane(origin=(0, 31.25, 0), x_dir=(1, 0, 0), z_dir=(0, 1, 0)), mode=Mode.PRIVATE) as cut_extrude5_sk2:
        with Locations((13.5, 17)):
            Rectangle(SKETCH10_W, SKETCH10_H)
    cut_extrude5_tool2 = extrude(cut_extrude5_sk2.sketch, amount=-CUT_EXTRUDE5_REACH, mode=Mode.PRIVATE) & part.part
    add(cut_extrude5_tool1.solids().sort_by_distance((4.5, 31.25, -17))[0], mode=Mode.SUBTRACT)
    add(cut_extrude5_tool2.solids().sort_by_distance((13.5, 31.25, -17))[0], mode=Mode.SUBTRACT)

    # Fillet6
    fillet6_edges = [part.edges().sort_by_distance(p)[0] for p in [
        (3, 26.25, -14.5),
        (3, 26.25, -19.5),
        (6, 26.25, -19.5),
        (6, 26.25, -14.5),
        (3, 31.25, -17),
        (4.5, 31.25, -14.5),
        (6, 31.25, -17),
        (4.5, 31.25, -19.5),
        (4.5, 21.25, -14.5),
        (3, 21.25, -17),
        (4.5, 21.25, -19.5),
        (6, 21.25, -17),
        (12, 26.25, -19.5),
        (15, 26.25, -19.5),
        (15, 26.25, -14.5),
        (12, 26.25, -14.5),
        (13.5, 31.25, -19.5),
        (12, 31.25, -17),
        (13.5, 31.25, -14.5),
        (15, 31.25, -17),
        (12, 21.25, -17),
        (13.5, 21.25, -19.5),
        (15, 21.25, -17),
        (13.5, 21.25, -14.5),
    ]]
    fillet(fillet6_edges, radius=FILLET6_R)


solid = part.part
